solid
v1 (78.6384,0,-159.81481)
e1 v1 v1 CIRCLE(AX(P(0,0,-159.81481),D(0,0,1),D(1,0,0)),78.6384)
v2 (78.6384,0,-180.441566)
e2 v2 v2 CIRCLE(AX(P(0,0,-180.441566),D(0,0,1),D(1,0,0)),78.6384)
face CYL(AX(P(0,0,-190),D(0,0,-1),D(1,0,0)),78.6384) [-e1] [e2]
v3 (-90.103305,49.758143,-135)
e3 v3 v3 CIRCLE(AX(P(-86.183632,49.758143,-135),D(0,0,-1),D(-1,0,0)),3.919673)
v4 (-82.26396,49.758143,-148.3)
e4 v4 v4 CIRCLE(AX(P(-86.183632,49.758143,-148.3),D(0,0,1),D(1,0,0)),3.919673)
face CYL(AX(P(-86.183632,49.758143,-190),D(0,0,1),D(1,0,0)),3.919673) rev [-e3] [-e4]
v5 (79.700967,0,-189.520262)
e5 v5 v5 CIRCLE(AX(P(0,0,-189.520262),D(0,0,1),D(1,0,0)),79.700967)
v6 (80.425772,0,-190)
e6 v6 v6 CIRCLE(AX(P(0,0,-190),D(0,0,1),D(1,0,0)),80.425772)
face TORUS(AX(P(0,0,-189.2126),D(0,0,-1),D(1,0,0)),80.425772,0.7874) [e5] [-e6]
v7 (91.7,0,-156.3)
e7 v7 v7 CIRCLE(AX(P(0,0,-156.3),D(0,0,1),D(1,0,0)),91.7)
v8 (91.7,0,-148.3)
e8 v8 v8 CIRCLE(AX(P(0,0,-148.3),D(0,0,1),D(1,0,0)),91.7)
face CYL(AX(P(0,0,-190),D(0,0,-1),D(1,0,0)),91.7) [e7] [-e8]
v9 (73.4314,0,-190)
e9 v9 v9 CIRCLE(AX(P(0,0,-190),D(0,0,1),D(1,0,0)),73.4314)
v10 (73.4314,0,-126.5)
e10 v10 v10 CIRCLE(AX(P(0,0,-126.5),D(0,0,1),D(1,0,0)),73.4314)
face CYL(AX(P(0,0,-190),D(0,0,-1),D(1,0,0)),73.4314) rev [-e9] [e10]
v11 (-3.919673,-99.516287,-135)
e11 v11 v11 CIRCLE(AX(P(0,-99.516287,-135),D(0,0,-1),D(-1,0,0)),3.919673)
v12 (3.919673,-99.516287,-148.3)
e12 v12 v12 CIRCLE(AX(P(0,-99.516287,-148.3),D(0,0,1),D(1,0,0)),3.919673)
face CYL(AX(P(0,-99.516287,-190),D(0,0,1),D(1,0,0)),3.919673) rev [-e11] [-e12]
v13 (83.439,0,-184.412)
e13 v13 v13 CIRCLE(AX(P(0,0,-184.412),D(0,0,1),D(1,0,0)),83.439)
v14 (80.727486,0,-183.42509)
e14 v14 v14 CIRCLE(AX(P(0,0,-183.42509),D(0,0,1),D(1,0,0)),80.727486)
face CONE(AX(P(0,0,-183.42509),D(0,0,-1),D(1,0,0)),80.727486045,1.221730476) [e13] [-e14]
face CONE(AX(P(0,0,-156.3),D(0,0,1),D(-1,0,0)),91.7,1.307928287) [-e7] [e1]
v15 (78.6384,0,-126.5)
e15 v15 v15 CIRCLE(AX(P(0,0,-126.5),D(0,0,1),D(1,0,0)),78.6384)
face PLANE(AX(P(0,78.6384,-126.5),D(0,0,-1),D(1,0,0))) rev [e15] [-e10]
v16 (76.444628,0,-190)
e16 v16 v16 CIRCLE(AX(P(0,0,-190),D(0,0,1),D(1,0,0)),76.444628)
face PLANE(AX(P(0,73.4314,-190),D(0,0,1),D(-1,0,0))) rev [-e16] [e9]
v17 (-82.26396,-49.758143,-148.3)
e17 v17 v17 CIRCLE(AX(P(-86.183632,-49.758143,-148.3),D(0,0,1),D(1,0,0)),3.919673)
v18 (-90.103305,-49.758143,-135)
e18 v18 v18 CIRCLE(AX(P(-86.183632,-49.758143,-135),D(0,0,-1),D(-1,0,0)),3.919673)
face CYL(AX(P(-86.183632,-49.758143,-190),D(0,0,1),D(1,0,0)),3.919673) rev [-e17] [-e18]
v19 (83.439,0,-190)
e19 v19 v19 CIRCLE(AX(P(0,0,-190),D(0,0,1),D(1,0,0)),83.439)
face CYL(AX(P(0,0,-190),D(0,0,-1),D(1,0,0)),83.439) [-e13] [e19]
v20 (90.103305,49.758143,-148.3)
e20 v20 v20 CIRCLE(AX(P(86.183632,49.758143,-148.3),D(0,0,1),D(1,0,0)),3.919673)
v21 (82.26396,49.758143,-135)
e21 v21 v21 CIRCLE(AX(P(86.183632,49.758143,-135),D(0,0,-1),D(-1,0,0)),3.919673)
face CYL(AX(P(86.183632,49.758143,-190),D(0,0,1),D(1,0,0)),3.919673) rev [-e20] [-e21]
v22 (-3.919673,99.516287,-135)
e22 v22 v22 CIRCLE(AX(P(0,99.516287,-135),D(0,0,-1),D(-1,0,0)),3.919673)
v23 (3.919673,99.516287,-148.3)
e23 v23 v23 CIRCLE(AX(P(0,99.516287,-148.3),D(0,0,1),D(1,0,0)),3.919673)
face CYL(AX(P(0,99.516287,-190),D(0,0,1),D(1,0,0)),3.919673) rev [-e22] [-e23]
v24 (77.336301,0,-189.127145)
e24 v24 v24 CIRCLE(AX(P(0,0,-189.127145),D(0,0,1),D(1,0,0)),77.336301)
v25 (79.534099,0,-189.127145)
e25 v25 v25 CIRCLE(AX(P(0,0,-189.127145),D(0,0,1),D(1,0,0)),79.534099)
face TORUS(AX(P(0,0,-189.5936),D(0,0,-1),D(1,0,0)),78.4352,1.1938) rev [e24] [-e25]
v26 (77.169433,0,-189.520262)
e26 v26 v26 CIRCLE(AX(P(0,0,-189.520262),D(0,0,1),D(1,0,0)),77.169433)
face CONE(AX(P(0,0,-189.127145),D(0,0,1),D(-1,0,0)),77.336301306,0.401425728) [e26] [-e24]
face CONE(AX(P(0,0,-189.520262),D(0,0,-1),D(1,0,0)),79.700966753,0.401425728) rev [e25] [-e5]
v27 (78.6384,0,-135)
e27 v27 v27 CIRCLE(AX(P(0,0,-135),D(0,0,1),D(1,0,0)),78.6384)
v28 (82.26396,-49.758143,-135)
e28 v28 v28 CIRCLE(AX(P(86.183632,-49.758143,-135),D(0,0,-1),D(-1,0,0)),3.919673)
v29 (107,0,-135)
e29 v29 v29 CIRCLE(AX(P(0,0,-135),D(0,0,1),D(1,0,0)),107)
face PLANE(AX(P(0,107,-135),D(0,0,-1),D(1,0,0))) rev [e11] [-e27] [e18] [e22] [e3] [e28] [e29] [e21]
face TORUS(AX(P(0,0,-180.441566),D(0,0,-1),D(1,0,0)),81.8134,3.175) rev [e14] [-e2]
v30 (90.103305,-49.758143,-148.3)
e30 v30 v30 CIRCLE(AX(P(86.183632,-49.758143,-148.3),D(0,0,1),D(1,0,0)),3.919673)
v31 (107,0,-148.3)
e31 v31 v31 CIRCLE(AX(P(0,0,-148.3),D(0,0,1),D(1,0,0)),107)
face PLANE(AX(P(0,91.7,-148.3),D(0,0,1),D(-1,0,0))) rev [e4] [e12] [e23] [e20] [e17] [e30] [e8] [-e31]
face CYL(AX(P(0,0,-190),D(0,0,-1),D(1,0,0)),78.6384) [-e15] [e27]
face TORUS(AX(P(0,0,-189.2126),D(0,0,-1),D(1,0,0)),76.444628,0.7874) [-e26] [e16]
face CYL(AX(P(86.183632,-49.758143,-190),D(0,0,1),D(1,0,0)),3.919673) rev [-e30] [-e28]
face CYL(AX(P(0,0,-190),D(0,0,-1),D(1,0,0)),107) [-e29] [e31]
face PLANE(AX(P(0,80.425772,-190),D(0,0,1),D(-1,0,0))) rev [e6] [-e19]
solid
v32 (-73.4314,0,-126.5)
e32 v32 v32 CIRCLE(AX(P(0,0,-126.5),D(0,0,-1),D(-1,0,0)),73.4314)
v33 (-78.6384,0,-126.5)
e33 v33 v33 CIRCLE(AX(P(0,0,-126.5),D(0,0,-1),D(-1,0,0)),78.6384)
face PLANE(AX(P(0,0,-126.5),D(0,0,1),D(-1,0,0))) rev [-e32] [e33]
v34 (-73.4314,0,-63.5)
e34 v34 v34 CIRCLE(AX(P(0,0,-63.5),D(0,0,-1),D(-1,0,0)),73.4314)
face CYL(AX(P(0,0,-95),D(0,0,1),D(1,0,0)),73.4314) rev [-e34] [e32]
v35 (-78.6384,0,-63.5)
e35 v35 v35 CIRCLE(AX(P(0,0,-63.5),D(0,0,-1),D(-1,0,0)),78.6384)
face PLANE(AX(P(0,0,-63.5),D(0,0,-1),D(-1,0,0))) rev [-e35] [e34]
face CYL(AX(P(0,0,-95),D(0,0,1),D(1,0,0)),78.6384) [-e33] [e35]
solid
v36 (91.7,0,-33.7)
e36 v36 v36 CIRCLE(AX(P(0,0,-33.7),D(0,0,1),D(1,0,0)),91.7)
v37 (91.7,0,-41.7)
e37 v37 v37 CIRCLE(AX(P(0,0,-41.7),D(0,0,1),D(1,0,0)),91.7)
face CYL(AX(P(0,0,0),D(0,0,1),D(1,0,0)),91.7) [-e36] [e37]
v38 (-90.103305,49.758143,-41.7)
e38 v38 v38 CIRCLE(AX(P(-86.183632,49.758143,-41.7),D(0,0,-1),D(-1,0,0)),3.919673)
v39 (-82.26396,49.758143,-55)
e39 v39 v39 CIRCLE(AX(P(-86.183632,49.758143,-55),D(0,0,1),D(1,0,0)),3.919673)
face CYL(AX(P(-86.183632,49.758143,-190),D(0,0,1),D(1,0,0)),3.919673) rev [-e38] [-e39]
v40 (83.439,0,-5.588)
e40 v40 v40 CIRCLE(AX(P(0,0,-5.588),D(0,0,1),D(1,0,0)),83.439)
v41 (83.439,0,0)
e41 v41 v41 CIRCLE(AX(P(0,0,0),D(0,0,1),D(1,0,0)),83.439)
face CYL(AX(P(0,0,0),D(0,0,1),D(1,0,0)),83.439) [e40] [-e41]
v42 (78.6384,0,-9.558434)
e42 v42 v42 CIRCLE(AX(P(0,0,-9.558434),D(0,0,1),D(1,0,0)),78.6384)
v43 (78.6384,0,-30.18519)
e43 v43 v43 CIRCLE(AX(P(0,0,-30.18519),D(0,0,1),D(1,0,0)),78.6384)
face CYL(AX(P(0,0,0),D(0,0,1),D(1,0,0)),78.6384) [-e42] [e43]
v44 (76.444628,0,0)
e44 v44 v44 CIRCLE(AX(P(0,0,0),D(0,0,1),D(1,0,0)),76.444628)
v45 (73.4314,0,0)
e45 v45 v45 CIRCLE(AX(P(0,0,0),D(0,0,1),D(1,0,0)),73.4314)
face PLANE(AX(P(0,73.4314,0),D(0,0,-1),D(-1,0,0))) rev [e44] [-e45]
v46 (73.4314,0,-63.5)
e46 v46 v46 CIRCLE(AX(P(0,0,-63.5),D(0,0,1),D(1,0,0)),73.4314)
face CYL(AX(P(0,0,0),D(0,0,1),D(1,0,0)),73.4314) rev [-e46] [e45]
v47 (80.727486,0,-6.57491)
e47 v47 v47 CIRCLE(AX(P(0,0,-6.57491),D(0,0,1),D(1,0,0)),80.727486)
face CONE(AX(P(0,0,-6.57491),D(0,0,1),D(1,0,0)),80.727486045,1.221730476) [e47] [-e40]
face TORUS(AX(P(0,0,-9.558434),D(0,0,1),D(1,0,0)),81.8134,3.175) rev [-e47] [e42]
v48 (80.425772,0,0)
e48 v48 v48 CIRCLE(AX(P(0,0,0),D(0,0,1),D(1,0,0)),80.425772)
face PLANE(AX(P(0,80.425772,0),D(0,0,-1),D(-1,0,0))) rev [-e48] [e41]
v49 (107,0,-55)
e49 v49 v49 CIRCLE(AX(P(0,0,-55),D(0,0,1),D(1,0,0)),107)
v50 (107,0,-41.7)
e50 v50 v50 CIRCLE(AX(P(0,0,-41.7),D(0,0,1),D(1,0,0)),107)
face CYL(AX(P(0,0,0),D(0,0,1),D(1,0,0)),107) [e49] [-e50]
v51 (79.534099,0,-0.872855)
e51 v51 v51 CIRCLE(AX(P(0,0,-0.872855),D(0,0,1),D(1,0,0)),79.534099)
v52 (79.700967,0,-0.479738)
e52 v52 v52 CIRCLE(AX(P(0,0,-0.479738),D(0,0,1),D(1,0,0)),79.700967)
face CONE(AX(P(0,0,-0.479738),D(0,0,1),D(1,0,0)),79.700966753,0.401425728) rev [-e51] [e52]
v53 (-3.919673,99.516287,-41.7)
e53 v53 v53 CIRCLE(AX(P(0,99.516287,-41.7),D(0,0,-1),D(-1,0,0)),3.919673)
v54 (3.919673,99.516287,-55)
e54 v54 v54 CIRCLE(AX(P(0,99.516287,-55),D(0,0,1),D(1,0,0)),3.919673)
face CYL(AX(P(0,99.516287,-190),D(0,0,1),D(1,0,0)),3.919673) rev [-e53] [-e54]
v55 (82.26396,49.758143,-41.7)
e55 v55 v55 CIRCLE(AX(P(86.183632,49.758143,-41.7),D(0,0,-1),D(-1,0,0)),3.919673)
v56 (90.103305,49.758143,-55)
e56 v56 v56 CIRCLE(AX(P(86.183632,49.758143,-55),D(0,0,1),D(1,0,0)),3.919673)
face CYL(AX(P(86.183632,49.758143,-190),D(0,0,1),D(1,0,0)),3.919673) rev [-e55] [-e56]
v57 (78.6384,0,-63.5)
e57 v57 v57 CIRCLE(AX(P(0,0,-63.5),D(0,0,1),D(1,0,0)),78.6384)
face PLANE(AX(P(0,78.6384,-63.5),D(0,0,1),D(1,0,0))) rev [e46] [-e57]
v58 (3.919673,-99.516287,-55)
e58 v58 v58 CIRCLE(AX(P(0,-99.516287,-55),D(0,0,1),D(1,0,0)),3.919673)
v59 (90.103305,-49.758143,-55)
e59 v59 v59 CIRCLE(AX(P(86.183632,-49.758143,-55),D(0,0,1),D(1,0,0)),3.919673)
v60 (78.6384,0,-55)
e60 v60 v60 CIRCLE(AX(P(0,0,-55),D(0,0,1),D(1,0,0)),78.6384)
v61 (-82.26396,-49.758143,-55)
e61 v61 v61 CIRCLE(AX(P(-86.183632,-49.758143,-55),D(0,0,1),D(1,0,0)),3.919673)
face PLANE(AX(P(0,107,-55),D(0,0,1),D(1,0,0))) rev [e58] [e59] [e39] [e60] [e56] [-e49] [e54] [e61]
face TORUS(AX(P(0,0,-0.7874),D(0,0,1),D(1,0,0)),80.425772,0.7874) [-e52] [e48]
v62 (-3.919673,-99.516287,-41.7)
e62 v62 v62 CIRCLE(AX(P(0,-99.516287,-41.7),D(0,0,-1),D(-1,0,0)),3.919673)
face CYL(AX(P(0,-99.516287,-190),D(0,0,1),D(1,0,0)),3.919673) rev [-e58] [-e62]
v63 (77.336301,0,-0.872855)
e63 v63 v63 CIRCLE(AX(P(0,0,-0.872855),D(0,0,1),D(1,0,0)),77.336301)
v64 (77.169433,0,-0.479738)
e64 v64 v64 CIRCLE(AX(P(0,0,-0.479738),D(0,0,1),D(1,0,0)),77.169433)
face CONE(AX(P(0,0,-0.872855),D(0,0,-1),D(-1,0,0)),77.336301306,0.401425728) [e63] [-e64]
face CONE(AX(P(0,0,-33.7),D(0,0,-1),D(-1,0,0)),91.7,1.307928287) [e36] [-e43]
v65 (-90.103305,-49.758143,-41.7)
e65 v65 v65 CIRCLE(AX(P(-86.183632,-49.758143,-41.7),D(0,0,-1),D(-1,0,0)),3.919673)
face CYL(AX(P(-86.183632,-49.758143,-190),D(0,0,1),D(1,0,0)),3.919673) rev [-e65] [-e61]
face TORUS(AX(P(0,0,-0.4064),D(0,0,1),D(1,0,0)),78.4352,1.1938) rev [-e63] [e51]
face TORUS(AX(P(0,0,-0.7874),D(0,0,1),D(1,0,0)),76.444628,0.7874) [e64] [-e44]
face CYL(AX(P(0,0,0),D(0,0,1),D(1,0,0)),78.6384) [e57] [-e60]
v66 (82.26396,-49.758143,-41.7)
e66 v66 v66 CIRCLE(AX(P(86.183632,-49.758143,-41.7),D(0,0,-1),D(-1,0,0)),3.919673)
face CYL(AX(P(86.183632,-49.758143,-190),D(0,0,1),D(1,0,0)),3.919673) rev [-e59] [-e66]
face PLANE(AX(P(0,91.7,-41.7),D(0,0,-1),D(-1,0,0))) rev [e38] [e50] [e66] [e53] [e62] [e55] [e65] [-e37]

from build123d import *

# Parameters (mm, degrees)
SKETCH2_R               = 78.6384
SKETCH2_R_2             = 73.4314
BOSS_EXTRUDE1_DEPTH     = 31.5
MIRROR2_START           = -126.5
MIRROR2_OUTLINE_R       = 78.6384
MIRROR2_OUTLINE_R_2     = 73.4314
MIRROR2_DEPTH           = 31.5
CUT_EXTRUDE1_DEPTH      = 212.87470354
CUT_EXTRUDE1_DEPTH_BACK = 212.87470354
SKETCH3_R               = 3.919672831


# Read off the part's stored shape, not the designer's step: Mirror2
with BuildPart() as part:
    # Sketch1 → Revolve1 (revolve)
    with BuildSketch(Plane(origin=(0, 0, 0), x_dir=(0, 0, -1), z_dir=(1, 0, 0)), mode=Mode.PRIVATE) as revolve1_sk:
        with BuildLine():
            Line((0, 73.4314), (0, 76.444627725))
            ThreePointArc((0, 76.444627725), (0.130798304, 76.879222907), (0.479738309, 77.169433247))
            Line((0.479738309, 77.169433247), (0.872854821, 77.336301306))
            ThreePointArc((0.872854821, 77.336301306), (1.6002, 78.4352), (0.872854821, 79.534098694))
            Line((0.872854821, 79.534098694), (0.479738309, 79.700966753))
            ThreePointArc((0.479738309, 79.700966753), (0.130798304, 79.991177093), (0, 80.425772275))
            Line((0, 80.425772275), (0, 83.439))
            Line((0, 83.439), (5.588, 83.439))
            Line((5.588, 83.439), (6.574910369, 80.727486045))
            ThreePointArc((6.574910369, 80.727486045), (7.737329255, 79.212592259), (9.55843444, 78.6384))
            Line((9.55843444, 78.6384), (30.185190067, 78.6384))
            Line((30.185190067, 78.6384), (33.7, 91.7))
            Line((33.7, 91.7), (41.7, 91.7))
            Line((41.7, 91.7), (41.7, 107))
            Line((41.7, 107), (55, 107))
            Line((55, 107), (55, 78.6384))
            Line((55, 78.6384), (63.5, 78.6384))
            Line((63.5, 78.6384), (63.5, 73.4314))
            Line((63.5, 73.4314), (0, 73.4314))
        make_face()
    revolve(revolve1_sk.sketch.rotate(Axis((0, 0, 0), (0, 0, -1)), 90), axis=Axis((0, 0, 0), (0, 0, -1)))


with BuildPart() as body_2:
    # Sketch2 → Boss-Extrude1 (new body)
    with BuildSketch(Plane(origin=(0, 0, -63.5), x_dir=(-1, 0, 0), z_dir=(0, 0, -1))):
        with Locations(Location((0, 0, 0), (0, 0, 180))):
            Circle(SKETCH2_R)
        with Locations(Location((0, 0, 0), (0, 0, 180))):
            Circle(SKETCH2_R_2, mode=Mode.SUBTRACT)
    extrude(amount=BOSS_EXTRUDE1_DEPTH)

    # Mirror2 outline → Mirror2 (add)
    with BuildSketch(Plane.XY.offset(MIRROR2_START)):
        Circle(MIRROR2_OUTLINE_R)
        Circle(MIRROR2_OUTLINE_R_2, mode=Mode.SUBTRACT)
    extrude(amount=MIRROR2_DEPTH)


with BuildPart() as body_3:
    # Mirror4: mirrored copy
    add(part.part.mirror(Plane(origin=(0, 0, -95), x_dir=(1, 0, 0), z_dir=(0, 0, -1))))


with BuildPart() as cut_extrude1_tool:
    # Sketch3 → Cut-Extrude1 (new, two sides: drawn at the far end of the back side and taken through both)
    with BuildSketch(Plane.XY.offset(-41.7).offset(-CUT_EXTRUDE1_DEPTH_BACK)):
        with Locations((0, 99.516286802)):
            Circle(SKETCH3_R)
        with Locations((86.183632461, 49.758143401)):
            Circle(SKETCH3_R)
        with Locations((86.183632461, -49.758143401)):
            Circle(SKETCH3_R)
        with Locations((0, -99.516286802)):
            Circle(SKETCH3_R)
        with Locations((-86.183632461, -49.758143401)):
            Circle(SKETCH3_R)
        with Locations((-86.183632461, 49.758143401)):
            Circle(SKETCH3_R)
    extrude(amount=CUT_EXTRUDE1_DEPTH + CUT_EXTRUDE1_DEPTH_BACK)


with BuildPart() as part_1:
    add(part.part)

    # Cut-Extrude1: cut by cut_extrude1_tool
    add(cut_extrude1_tool.part, mode=Mode.SUBTRACT)


with BuildPart() as body_3_1:
    add(body_3.part)

    # Cut-Extrude1: cut by cut_extrude1_tool
    add(cut_extrude1_tool.part, mode=Mode.SUBTRACT)


solid = Compound([body_2.part, part_1.part, body_3_1.part])
